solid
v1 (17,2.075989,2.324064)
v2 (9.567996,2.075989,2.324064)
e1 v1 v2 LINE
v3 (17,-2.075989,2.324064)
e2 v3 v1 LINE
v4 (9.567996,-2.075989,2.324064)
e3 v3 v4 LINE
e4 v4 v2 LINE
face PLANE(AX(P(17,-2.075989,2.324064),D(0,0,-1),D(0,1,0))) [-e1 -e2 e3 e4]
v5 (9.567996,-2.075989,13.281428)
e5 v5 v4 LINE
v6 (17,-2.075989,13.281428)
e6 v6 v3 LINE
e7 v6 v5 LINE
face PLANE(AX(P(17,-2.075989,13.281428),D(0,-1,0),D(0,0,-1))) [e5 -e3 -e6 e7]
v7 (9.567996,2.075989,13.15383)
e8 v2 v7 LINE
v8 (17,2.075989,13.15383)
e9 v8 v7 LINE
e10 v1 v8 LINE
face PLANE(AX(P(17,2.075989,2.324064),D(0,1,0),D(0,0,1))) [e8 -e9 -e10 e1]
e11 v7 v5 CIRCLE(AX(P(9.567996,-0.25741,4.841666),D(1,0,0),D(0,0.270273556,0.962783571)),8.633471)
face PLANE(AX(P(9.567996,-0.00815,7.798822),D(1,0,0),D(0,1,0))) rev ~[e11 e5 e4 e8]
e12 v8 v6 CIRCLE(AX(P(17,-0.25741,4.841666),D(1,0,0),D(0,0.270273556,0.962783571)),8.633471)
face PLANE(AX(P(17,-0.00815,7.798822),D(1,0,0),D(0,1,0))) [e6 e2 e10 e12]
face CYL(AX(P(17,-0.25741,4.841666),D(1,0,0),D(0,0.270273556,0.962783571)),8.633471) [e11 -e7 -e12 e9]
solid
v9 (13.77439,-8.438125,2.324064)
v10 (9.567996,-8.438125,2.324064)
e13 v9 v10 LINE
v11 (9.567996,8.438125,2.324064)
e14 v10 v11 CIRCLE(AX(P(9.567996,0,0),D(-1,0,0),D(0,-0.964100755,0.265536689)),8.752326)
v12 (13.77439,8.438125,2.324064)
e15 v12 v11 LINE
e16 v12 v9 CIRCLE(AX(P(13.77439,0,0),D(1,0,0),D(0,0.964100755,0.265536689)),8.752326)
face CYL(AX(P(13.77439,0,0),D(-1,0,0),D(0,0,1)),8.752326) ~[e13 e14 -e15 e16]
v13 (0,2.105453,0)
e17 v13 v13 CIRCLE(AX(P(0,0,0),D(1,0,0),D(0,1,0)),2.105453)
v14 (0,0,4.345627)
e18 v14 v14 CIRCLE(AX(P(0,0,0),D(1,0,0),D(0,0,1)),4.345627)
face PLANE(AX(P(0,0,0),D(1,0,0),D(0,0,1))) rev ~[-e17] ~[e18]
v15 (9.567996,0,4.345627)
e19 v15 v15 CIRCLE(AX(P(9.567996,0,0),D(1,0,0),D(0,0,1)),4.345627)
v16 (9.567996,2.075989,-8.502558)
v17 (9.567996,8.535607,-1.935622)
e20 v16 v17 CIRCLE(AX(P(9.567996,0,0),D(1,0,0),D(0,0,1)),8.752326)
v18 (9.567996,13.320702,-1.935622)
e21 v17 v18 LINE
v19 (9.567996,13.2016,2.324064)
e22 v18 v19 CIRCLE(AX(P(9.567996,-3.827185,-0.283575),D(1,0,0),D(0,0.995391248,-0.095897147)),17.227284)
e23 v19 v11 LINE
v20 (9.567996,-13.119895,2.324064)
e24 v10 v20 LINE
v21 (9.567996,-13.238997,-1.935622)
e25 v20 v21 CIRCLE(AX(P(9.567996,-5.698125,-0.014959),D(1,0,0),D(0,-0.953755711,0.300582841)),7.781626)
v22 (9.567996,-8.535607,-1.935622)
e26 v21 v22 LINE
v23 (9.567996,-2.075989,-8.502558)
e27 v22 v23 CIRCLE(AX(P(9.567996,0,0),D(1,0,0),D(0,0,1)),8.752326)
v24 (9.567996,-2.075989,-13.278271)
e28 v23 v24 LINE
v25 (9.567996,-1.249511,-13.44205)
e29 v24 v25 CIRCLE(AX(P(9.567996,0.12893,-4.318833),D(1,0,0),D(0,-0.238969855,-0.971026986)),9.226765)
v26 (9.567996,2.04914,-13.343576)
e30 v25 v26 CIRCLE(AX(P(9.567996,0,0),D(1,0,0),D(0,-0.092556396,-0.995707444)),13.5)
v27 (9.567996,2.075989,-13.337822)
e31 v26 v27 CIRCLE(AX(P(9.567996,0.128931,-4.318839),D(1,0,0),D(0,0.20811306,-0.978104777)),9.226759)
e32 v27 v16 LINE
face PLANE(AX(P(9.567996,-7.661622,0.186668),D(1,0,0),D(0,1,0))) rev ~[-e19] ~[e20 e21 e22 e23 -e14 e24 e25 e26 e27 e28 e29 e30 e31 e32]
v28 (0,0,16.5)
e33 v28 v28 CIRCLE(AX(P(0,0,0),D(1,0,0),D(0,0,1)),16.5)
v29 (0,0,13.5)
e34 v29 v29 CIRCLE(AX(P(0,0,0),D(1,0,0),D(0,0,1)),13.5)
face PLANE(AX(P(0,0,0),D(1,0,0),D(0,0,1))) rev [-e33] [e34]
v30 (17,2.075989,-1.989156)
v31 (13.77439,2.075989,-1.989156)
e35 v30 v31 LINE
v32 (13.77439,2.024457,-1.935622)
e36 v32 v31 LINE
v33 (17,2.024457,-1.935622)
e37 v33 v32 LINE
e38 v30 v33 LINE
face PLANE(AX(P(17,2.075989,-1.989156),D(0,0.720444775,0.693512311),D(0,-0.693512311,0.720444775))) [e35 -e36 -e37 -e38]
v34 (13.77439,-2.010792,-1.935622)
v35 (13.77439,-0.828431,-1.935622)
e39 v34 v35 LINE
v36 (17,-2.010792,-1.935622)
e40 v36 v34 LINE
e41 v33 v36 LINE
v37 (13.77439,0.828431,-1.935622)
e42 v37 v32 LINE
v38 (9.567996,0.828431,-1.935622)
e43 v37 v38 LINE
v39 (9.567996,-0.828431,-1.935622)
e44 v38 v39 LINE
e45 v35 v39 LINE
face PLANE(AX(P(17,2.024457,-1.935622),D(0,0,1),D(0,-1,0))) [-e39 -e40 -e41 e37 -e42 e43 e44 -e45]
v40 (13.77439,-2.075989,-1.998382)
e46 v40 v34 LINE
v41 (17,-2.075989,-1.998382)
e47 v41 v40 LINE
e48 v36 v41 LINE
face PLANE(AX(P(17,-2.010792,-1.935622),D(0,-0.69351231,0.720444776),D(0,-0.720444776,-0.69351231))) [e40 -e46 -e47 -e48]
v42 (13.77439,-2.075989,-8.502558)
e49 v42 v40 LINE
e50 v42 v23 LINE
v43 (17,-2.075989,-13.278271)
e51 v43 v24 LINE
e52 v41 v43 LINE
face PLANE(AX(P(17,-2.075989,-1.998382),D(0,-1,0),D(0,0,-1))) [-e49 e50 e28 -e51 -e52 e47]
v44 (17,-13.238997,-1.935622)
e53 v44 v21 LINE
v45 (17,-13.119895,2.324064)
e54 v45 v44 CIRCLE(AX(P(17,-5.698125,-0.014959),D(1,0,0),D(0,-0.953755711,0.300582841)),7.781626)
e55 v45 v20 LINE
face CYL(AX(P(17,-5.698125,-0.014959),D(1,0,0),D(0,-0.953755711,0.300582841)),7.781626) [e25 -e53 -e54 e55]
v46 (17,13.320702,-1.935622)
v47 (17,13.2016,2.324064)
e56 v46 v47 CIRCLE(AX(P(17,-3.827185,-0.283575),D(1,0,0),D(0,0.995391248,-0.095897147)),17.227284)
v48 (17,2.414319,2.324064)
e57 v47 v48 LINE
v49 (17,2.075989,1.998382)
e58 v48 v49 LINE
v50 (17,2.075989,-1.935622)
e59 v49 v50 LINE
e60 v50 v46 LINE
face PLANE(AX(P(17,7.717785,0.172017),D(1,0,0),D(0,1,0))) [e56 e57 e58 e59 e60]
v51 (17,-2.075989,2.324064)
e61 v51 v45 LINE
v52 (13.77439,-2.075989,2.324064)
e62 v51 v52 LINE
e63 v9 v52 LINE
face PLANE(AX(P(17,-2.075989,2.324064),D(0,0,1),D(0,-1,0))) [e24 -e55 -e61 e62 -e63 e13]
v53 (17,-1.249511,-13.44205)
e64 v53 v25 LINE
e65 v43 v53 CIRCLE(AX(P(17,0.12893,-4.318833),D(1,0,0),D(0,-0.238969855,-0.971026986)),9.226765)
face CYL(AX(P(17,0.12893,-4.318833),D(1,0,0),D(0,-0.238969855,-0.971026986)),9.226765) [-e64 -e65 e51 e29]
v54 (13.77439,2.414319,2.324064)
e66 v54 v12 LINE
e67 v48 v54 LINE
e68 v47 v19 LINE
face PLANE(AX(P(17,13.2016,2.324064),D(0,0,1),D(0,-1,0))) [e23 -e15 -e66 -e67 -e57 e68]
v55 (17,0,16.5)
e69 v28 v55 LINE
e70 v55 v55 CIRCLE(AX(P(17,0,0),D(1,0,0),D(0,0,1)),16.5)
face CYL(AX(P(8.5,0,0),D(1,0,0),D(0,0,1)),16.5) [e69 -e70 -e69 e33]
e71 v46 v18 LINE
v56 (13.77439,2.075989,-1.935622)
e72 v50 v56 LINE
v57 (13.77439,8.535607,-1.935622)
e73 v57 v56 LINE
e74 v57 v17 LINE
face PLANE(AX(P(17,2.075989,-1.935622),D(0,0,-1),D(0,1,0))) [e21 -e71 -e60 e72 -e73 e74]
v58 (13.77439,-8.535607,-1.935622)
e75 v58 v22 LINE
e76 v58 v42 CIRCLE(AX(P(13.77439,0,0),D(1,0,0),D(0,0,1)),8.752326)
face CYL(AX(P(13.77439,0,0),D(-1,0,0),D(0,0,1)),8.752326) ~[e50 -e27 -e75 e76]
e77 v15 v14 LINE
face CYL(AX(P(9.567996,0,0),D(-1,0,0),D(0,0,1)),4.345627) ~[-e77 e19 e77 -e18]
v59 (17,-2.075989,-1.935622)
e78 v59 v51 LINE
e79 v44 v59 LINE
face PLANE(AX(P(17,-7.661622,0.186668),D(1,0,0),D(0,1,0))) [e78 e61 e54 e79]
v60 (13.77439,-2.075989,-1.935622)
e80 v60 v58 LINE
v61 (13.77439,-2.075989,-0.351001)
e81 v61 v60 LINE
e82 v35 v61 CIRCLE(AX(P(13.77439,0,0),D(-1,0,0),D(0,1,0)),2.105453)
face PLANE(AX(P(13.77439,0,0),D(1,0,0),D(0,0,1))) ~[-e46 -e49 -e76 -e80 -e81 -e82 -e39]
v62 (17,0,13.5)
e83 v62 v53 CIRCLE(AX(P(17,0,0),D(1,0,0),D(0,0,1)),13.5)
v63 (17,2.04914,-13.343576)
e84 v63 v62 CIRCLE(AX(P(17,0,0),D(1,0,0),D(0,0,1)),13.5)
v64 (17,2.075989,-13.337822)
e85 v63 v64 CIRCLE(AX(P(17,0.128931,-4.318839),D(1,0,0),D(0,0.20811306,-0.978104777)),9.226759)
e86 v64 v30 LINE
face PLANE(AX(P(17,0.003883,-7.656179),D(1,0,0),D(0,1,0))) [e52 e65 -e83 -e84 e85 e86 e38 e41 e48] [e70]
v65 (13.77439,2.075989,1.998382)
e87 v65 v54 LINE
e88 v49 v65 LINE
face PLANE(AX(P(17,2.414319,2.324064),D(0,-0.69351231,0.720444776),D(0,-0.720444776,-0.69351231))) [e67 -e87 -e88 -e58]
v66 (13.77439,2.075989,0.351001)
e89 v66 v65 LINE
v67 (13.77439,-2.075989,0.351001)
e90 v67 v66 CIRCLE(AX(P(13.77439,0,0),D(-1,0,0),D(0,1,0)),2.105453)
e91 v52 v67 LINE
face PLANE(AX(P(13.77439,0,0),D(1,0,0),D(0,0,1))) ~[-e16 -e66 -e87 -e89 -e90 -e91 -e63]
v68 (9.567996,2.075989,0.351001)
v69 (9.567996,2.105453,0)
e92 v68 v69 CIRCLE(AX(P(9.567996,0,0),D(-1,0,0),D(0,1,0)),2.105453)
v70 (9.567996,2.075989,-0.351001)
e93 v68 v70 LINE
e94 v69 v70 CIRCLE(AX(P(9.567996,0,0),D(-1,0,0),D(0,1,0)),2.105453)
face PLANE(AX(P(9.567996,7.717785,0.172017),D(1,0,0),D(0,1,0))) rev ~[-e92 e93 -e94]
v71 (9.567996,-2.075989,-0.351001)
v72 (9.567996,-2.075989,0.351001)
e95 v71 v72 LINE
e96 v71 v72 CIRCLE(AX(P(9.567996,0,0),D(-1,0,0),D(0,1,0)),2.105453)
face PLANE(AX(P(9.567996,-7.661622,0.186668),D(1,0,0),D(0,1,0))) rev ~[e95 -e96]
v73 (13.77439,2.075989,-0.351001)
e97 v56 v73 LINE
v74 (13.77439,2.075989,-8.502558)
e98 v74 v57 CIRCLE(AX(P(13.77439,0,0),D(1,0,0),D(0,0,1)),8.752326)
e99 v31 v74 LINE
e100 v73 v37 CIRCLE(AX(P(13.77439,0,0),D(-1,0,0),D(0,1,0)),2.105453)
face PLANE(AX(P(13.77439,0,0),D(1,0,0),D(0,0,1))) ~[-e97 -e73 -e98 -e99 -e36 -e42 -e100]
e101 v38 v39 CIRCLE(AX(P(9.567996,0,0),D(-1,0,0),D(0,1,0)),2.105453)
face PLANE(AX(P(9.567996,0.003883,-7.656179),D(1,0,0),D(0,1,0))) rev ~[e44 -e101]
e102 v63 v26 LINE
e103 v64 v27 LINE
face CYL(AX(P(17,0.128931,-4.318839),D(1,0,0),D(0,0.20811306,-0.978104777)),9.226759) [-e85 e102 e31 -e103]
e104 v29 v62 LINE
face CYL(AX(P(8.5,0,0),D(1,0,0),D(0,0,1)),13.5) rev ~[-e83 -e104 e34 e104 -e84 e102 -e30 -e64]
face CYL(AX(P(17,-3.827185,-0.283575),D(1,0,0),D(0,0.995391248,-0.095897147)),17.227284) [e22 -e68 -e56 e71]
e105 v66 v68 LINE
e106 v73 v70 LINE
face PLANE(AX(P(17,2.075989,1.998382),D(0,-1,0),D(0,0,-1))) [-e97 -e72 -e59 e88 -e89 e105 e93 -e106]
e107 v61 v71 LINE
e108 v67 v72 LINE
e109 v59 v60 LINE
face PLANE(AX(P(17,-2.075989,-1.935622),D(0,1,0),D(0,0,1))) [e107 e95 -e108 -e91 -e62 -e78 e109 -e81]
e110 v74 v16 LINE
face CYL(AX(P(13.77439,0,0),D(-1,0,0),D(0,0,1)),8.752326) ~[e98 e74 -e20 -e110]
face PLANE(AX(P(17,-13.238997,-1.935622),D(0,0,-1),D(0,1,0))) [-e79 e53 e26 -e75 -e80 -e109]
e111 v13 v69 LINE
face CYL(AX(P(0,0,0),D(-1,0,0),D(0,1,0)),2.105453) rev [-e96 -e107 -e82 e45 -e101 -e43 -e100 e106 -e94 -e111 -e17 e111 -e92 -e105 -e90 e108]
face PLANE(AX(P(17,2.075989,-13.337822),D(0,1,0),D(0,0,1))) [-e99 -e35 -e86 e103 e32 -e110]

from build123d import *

# Parameters (mm, degrees)
F0_W     = 17
F0_H     = 3
F2_R     = 2.10545285
F3_DEPTH = 17.001
F5_DEPTH = 7.4320044443


# Not quite as in the source:
# - a feature of the source that left no trace in its solid (it failed there, or was rolled back) is left out


with BuildPart() as f1:
    # F0 (on Front) → F1 (revolve)
    with BuildSketch(Plane.XZ):
        Polygon((0, 4.3456270359), (0, 0), (13.7743903324, 0), (13.7743903324, 8.752326481), (9.5679955557, 8.752326481), (9.5679955557, 4.3456270359), align=None)
    revolve(axis=Axis((-17.2238798179, 0, 0), (1, 0, 0)))

    # F2 (on Right) → F3 (cut, through all)
    with BuildSketch(Plane.YZ):
        Circle(F2_R)
    extrude(amount=F3_DEPTH, mode=Mode.SUBTRACT)



with BuildPart() as f1b:
    # F0 (on Front) → F1, piece 2 (revolve)
    with BuildSketch(Plane.XZ):
        with Locations((8.5, 15)):
            Rectangle(F0_W, F0_H)
    revolve(axis=Axis((-17.2238798179, 0, 0), (1, 0, 0)))


with BuildPart() as f5:
    # F4 (on face) → F5 (new body, through all)
    with BuildSketch(Plane.YZ.offset(17)):
        with BuildLine():
            Line((2.075988996, 2.3240637966), (2.075988996, 3.8176883089))
            Line((2.075988996, 3.8176883089), (2.075988996, 13.1538297552))
            ThreePointArc((2.075988996, 13.1538297552), (0.0077885172, 13.4710626416), (-2.075988996, 13.2814282551))
            Line((-2.075988996, 13.2814282551), (-2.075988996, 3.8176883089))
            Line((-2.075988996, 3.8176883089), (-2.075988996, 2.3240637966))
            Line((-2.075988996, 2.3240637966), (2.075988996, 2.3240637966))
        make_face()
    extrude(amount=-F5_DEPTH)


with BuildPart() as f1_1:
    add(f1.part)

    add(f1b.part)  # F5#2 merges F1b
    # F4 (on face) → F5, piece 2 (join, through all)
    with BuildSketch(Plane.YZ.offset(17)):
        with BuildLine():
            Line((-2.075988996, -1.9356221886), (-2.075988996, 2.3240637966))
            Line((-2.075988996, 2.3240637966), (-13.1198950112, 2.3240637966))
            ThreePointArc((-13.1198950112, 2.3240637966), (-13.4767107858, 0.2025324211), (-13.2389972203, -1.9356221886))
            Line((-13.2389972203, -1.9356221886), (-3.8907378578, -1.9356221886))
            Line((-3.8907378578, -1.9356221886), (-2.075988996, -1.9356221886))
        make_face()
        with BuildLine():
            Line((2.41431853, 2.3240637966), (2.075988996, 1.9983820725))
            Line((2.075988996, 1.9983820725), (2.075988996, -1.9356221886))
            Line((2.075988996, -1.9356221886), (13.3207021949, -1.9356221886))
            ThreePointArc((13.3207021949, -1.9356221886), (13.3933684368, 0.1979176461), (13.2015999407, 2.3240637966))
            Line((13.2015999407, 2.3240637966), (2.41431853, 2.3240637966))
        make_face()
        with BuildLine():
            Line((2.075988996, -13.3378216997), (2.075988996, -1.9891557531))
            Line((2.075988996, -1.9891557531), (2.0244566825, -1.9356221886))
            Line((2.0244566825, -1.9356221886), (-2.0107918397, -1.9356221886))
            Line((-2.0107918397, -1.9356221886), (-2.075988996, -1.9983820725))
            Line((-2.075988996, -1.9983820725), (-2.075988996, -13.2782710716))
            ThreePointArc((-2.075988996, -13.2782710716), (-1.6646206015, -13.3695995078), (-1.2495113457, -13.4420504908))
            ThreePointArc((-1.2495113457, -13.4420504908), (0.4028347053, -13.4939884467), (2.049140015, -13.3435761773))
            ThreePointArc((2.049140015, -13.3435761773), (2.0625666461, -13.3407089263), (2.075988996, -13.3378216997))
        make_face()
    extrude(amount=-F5_DEPTH)


solid = Compound([f5.part, f1_1.part])
